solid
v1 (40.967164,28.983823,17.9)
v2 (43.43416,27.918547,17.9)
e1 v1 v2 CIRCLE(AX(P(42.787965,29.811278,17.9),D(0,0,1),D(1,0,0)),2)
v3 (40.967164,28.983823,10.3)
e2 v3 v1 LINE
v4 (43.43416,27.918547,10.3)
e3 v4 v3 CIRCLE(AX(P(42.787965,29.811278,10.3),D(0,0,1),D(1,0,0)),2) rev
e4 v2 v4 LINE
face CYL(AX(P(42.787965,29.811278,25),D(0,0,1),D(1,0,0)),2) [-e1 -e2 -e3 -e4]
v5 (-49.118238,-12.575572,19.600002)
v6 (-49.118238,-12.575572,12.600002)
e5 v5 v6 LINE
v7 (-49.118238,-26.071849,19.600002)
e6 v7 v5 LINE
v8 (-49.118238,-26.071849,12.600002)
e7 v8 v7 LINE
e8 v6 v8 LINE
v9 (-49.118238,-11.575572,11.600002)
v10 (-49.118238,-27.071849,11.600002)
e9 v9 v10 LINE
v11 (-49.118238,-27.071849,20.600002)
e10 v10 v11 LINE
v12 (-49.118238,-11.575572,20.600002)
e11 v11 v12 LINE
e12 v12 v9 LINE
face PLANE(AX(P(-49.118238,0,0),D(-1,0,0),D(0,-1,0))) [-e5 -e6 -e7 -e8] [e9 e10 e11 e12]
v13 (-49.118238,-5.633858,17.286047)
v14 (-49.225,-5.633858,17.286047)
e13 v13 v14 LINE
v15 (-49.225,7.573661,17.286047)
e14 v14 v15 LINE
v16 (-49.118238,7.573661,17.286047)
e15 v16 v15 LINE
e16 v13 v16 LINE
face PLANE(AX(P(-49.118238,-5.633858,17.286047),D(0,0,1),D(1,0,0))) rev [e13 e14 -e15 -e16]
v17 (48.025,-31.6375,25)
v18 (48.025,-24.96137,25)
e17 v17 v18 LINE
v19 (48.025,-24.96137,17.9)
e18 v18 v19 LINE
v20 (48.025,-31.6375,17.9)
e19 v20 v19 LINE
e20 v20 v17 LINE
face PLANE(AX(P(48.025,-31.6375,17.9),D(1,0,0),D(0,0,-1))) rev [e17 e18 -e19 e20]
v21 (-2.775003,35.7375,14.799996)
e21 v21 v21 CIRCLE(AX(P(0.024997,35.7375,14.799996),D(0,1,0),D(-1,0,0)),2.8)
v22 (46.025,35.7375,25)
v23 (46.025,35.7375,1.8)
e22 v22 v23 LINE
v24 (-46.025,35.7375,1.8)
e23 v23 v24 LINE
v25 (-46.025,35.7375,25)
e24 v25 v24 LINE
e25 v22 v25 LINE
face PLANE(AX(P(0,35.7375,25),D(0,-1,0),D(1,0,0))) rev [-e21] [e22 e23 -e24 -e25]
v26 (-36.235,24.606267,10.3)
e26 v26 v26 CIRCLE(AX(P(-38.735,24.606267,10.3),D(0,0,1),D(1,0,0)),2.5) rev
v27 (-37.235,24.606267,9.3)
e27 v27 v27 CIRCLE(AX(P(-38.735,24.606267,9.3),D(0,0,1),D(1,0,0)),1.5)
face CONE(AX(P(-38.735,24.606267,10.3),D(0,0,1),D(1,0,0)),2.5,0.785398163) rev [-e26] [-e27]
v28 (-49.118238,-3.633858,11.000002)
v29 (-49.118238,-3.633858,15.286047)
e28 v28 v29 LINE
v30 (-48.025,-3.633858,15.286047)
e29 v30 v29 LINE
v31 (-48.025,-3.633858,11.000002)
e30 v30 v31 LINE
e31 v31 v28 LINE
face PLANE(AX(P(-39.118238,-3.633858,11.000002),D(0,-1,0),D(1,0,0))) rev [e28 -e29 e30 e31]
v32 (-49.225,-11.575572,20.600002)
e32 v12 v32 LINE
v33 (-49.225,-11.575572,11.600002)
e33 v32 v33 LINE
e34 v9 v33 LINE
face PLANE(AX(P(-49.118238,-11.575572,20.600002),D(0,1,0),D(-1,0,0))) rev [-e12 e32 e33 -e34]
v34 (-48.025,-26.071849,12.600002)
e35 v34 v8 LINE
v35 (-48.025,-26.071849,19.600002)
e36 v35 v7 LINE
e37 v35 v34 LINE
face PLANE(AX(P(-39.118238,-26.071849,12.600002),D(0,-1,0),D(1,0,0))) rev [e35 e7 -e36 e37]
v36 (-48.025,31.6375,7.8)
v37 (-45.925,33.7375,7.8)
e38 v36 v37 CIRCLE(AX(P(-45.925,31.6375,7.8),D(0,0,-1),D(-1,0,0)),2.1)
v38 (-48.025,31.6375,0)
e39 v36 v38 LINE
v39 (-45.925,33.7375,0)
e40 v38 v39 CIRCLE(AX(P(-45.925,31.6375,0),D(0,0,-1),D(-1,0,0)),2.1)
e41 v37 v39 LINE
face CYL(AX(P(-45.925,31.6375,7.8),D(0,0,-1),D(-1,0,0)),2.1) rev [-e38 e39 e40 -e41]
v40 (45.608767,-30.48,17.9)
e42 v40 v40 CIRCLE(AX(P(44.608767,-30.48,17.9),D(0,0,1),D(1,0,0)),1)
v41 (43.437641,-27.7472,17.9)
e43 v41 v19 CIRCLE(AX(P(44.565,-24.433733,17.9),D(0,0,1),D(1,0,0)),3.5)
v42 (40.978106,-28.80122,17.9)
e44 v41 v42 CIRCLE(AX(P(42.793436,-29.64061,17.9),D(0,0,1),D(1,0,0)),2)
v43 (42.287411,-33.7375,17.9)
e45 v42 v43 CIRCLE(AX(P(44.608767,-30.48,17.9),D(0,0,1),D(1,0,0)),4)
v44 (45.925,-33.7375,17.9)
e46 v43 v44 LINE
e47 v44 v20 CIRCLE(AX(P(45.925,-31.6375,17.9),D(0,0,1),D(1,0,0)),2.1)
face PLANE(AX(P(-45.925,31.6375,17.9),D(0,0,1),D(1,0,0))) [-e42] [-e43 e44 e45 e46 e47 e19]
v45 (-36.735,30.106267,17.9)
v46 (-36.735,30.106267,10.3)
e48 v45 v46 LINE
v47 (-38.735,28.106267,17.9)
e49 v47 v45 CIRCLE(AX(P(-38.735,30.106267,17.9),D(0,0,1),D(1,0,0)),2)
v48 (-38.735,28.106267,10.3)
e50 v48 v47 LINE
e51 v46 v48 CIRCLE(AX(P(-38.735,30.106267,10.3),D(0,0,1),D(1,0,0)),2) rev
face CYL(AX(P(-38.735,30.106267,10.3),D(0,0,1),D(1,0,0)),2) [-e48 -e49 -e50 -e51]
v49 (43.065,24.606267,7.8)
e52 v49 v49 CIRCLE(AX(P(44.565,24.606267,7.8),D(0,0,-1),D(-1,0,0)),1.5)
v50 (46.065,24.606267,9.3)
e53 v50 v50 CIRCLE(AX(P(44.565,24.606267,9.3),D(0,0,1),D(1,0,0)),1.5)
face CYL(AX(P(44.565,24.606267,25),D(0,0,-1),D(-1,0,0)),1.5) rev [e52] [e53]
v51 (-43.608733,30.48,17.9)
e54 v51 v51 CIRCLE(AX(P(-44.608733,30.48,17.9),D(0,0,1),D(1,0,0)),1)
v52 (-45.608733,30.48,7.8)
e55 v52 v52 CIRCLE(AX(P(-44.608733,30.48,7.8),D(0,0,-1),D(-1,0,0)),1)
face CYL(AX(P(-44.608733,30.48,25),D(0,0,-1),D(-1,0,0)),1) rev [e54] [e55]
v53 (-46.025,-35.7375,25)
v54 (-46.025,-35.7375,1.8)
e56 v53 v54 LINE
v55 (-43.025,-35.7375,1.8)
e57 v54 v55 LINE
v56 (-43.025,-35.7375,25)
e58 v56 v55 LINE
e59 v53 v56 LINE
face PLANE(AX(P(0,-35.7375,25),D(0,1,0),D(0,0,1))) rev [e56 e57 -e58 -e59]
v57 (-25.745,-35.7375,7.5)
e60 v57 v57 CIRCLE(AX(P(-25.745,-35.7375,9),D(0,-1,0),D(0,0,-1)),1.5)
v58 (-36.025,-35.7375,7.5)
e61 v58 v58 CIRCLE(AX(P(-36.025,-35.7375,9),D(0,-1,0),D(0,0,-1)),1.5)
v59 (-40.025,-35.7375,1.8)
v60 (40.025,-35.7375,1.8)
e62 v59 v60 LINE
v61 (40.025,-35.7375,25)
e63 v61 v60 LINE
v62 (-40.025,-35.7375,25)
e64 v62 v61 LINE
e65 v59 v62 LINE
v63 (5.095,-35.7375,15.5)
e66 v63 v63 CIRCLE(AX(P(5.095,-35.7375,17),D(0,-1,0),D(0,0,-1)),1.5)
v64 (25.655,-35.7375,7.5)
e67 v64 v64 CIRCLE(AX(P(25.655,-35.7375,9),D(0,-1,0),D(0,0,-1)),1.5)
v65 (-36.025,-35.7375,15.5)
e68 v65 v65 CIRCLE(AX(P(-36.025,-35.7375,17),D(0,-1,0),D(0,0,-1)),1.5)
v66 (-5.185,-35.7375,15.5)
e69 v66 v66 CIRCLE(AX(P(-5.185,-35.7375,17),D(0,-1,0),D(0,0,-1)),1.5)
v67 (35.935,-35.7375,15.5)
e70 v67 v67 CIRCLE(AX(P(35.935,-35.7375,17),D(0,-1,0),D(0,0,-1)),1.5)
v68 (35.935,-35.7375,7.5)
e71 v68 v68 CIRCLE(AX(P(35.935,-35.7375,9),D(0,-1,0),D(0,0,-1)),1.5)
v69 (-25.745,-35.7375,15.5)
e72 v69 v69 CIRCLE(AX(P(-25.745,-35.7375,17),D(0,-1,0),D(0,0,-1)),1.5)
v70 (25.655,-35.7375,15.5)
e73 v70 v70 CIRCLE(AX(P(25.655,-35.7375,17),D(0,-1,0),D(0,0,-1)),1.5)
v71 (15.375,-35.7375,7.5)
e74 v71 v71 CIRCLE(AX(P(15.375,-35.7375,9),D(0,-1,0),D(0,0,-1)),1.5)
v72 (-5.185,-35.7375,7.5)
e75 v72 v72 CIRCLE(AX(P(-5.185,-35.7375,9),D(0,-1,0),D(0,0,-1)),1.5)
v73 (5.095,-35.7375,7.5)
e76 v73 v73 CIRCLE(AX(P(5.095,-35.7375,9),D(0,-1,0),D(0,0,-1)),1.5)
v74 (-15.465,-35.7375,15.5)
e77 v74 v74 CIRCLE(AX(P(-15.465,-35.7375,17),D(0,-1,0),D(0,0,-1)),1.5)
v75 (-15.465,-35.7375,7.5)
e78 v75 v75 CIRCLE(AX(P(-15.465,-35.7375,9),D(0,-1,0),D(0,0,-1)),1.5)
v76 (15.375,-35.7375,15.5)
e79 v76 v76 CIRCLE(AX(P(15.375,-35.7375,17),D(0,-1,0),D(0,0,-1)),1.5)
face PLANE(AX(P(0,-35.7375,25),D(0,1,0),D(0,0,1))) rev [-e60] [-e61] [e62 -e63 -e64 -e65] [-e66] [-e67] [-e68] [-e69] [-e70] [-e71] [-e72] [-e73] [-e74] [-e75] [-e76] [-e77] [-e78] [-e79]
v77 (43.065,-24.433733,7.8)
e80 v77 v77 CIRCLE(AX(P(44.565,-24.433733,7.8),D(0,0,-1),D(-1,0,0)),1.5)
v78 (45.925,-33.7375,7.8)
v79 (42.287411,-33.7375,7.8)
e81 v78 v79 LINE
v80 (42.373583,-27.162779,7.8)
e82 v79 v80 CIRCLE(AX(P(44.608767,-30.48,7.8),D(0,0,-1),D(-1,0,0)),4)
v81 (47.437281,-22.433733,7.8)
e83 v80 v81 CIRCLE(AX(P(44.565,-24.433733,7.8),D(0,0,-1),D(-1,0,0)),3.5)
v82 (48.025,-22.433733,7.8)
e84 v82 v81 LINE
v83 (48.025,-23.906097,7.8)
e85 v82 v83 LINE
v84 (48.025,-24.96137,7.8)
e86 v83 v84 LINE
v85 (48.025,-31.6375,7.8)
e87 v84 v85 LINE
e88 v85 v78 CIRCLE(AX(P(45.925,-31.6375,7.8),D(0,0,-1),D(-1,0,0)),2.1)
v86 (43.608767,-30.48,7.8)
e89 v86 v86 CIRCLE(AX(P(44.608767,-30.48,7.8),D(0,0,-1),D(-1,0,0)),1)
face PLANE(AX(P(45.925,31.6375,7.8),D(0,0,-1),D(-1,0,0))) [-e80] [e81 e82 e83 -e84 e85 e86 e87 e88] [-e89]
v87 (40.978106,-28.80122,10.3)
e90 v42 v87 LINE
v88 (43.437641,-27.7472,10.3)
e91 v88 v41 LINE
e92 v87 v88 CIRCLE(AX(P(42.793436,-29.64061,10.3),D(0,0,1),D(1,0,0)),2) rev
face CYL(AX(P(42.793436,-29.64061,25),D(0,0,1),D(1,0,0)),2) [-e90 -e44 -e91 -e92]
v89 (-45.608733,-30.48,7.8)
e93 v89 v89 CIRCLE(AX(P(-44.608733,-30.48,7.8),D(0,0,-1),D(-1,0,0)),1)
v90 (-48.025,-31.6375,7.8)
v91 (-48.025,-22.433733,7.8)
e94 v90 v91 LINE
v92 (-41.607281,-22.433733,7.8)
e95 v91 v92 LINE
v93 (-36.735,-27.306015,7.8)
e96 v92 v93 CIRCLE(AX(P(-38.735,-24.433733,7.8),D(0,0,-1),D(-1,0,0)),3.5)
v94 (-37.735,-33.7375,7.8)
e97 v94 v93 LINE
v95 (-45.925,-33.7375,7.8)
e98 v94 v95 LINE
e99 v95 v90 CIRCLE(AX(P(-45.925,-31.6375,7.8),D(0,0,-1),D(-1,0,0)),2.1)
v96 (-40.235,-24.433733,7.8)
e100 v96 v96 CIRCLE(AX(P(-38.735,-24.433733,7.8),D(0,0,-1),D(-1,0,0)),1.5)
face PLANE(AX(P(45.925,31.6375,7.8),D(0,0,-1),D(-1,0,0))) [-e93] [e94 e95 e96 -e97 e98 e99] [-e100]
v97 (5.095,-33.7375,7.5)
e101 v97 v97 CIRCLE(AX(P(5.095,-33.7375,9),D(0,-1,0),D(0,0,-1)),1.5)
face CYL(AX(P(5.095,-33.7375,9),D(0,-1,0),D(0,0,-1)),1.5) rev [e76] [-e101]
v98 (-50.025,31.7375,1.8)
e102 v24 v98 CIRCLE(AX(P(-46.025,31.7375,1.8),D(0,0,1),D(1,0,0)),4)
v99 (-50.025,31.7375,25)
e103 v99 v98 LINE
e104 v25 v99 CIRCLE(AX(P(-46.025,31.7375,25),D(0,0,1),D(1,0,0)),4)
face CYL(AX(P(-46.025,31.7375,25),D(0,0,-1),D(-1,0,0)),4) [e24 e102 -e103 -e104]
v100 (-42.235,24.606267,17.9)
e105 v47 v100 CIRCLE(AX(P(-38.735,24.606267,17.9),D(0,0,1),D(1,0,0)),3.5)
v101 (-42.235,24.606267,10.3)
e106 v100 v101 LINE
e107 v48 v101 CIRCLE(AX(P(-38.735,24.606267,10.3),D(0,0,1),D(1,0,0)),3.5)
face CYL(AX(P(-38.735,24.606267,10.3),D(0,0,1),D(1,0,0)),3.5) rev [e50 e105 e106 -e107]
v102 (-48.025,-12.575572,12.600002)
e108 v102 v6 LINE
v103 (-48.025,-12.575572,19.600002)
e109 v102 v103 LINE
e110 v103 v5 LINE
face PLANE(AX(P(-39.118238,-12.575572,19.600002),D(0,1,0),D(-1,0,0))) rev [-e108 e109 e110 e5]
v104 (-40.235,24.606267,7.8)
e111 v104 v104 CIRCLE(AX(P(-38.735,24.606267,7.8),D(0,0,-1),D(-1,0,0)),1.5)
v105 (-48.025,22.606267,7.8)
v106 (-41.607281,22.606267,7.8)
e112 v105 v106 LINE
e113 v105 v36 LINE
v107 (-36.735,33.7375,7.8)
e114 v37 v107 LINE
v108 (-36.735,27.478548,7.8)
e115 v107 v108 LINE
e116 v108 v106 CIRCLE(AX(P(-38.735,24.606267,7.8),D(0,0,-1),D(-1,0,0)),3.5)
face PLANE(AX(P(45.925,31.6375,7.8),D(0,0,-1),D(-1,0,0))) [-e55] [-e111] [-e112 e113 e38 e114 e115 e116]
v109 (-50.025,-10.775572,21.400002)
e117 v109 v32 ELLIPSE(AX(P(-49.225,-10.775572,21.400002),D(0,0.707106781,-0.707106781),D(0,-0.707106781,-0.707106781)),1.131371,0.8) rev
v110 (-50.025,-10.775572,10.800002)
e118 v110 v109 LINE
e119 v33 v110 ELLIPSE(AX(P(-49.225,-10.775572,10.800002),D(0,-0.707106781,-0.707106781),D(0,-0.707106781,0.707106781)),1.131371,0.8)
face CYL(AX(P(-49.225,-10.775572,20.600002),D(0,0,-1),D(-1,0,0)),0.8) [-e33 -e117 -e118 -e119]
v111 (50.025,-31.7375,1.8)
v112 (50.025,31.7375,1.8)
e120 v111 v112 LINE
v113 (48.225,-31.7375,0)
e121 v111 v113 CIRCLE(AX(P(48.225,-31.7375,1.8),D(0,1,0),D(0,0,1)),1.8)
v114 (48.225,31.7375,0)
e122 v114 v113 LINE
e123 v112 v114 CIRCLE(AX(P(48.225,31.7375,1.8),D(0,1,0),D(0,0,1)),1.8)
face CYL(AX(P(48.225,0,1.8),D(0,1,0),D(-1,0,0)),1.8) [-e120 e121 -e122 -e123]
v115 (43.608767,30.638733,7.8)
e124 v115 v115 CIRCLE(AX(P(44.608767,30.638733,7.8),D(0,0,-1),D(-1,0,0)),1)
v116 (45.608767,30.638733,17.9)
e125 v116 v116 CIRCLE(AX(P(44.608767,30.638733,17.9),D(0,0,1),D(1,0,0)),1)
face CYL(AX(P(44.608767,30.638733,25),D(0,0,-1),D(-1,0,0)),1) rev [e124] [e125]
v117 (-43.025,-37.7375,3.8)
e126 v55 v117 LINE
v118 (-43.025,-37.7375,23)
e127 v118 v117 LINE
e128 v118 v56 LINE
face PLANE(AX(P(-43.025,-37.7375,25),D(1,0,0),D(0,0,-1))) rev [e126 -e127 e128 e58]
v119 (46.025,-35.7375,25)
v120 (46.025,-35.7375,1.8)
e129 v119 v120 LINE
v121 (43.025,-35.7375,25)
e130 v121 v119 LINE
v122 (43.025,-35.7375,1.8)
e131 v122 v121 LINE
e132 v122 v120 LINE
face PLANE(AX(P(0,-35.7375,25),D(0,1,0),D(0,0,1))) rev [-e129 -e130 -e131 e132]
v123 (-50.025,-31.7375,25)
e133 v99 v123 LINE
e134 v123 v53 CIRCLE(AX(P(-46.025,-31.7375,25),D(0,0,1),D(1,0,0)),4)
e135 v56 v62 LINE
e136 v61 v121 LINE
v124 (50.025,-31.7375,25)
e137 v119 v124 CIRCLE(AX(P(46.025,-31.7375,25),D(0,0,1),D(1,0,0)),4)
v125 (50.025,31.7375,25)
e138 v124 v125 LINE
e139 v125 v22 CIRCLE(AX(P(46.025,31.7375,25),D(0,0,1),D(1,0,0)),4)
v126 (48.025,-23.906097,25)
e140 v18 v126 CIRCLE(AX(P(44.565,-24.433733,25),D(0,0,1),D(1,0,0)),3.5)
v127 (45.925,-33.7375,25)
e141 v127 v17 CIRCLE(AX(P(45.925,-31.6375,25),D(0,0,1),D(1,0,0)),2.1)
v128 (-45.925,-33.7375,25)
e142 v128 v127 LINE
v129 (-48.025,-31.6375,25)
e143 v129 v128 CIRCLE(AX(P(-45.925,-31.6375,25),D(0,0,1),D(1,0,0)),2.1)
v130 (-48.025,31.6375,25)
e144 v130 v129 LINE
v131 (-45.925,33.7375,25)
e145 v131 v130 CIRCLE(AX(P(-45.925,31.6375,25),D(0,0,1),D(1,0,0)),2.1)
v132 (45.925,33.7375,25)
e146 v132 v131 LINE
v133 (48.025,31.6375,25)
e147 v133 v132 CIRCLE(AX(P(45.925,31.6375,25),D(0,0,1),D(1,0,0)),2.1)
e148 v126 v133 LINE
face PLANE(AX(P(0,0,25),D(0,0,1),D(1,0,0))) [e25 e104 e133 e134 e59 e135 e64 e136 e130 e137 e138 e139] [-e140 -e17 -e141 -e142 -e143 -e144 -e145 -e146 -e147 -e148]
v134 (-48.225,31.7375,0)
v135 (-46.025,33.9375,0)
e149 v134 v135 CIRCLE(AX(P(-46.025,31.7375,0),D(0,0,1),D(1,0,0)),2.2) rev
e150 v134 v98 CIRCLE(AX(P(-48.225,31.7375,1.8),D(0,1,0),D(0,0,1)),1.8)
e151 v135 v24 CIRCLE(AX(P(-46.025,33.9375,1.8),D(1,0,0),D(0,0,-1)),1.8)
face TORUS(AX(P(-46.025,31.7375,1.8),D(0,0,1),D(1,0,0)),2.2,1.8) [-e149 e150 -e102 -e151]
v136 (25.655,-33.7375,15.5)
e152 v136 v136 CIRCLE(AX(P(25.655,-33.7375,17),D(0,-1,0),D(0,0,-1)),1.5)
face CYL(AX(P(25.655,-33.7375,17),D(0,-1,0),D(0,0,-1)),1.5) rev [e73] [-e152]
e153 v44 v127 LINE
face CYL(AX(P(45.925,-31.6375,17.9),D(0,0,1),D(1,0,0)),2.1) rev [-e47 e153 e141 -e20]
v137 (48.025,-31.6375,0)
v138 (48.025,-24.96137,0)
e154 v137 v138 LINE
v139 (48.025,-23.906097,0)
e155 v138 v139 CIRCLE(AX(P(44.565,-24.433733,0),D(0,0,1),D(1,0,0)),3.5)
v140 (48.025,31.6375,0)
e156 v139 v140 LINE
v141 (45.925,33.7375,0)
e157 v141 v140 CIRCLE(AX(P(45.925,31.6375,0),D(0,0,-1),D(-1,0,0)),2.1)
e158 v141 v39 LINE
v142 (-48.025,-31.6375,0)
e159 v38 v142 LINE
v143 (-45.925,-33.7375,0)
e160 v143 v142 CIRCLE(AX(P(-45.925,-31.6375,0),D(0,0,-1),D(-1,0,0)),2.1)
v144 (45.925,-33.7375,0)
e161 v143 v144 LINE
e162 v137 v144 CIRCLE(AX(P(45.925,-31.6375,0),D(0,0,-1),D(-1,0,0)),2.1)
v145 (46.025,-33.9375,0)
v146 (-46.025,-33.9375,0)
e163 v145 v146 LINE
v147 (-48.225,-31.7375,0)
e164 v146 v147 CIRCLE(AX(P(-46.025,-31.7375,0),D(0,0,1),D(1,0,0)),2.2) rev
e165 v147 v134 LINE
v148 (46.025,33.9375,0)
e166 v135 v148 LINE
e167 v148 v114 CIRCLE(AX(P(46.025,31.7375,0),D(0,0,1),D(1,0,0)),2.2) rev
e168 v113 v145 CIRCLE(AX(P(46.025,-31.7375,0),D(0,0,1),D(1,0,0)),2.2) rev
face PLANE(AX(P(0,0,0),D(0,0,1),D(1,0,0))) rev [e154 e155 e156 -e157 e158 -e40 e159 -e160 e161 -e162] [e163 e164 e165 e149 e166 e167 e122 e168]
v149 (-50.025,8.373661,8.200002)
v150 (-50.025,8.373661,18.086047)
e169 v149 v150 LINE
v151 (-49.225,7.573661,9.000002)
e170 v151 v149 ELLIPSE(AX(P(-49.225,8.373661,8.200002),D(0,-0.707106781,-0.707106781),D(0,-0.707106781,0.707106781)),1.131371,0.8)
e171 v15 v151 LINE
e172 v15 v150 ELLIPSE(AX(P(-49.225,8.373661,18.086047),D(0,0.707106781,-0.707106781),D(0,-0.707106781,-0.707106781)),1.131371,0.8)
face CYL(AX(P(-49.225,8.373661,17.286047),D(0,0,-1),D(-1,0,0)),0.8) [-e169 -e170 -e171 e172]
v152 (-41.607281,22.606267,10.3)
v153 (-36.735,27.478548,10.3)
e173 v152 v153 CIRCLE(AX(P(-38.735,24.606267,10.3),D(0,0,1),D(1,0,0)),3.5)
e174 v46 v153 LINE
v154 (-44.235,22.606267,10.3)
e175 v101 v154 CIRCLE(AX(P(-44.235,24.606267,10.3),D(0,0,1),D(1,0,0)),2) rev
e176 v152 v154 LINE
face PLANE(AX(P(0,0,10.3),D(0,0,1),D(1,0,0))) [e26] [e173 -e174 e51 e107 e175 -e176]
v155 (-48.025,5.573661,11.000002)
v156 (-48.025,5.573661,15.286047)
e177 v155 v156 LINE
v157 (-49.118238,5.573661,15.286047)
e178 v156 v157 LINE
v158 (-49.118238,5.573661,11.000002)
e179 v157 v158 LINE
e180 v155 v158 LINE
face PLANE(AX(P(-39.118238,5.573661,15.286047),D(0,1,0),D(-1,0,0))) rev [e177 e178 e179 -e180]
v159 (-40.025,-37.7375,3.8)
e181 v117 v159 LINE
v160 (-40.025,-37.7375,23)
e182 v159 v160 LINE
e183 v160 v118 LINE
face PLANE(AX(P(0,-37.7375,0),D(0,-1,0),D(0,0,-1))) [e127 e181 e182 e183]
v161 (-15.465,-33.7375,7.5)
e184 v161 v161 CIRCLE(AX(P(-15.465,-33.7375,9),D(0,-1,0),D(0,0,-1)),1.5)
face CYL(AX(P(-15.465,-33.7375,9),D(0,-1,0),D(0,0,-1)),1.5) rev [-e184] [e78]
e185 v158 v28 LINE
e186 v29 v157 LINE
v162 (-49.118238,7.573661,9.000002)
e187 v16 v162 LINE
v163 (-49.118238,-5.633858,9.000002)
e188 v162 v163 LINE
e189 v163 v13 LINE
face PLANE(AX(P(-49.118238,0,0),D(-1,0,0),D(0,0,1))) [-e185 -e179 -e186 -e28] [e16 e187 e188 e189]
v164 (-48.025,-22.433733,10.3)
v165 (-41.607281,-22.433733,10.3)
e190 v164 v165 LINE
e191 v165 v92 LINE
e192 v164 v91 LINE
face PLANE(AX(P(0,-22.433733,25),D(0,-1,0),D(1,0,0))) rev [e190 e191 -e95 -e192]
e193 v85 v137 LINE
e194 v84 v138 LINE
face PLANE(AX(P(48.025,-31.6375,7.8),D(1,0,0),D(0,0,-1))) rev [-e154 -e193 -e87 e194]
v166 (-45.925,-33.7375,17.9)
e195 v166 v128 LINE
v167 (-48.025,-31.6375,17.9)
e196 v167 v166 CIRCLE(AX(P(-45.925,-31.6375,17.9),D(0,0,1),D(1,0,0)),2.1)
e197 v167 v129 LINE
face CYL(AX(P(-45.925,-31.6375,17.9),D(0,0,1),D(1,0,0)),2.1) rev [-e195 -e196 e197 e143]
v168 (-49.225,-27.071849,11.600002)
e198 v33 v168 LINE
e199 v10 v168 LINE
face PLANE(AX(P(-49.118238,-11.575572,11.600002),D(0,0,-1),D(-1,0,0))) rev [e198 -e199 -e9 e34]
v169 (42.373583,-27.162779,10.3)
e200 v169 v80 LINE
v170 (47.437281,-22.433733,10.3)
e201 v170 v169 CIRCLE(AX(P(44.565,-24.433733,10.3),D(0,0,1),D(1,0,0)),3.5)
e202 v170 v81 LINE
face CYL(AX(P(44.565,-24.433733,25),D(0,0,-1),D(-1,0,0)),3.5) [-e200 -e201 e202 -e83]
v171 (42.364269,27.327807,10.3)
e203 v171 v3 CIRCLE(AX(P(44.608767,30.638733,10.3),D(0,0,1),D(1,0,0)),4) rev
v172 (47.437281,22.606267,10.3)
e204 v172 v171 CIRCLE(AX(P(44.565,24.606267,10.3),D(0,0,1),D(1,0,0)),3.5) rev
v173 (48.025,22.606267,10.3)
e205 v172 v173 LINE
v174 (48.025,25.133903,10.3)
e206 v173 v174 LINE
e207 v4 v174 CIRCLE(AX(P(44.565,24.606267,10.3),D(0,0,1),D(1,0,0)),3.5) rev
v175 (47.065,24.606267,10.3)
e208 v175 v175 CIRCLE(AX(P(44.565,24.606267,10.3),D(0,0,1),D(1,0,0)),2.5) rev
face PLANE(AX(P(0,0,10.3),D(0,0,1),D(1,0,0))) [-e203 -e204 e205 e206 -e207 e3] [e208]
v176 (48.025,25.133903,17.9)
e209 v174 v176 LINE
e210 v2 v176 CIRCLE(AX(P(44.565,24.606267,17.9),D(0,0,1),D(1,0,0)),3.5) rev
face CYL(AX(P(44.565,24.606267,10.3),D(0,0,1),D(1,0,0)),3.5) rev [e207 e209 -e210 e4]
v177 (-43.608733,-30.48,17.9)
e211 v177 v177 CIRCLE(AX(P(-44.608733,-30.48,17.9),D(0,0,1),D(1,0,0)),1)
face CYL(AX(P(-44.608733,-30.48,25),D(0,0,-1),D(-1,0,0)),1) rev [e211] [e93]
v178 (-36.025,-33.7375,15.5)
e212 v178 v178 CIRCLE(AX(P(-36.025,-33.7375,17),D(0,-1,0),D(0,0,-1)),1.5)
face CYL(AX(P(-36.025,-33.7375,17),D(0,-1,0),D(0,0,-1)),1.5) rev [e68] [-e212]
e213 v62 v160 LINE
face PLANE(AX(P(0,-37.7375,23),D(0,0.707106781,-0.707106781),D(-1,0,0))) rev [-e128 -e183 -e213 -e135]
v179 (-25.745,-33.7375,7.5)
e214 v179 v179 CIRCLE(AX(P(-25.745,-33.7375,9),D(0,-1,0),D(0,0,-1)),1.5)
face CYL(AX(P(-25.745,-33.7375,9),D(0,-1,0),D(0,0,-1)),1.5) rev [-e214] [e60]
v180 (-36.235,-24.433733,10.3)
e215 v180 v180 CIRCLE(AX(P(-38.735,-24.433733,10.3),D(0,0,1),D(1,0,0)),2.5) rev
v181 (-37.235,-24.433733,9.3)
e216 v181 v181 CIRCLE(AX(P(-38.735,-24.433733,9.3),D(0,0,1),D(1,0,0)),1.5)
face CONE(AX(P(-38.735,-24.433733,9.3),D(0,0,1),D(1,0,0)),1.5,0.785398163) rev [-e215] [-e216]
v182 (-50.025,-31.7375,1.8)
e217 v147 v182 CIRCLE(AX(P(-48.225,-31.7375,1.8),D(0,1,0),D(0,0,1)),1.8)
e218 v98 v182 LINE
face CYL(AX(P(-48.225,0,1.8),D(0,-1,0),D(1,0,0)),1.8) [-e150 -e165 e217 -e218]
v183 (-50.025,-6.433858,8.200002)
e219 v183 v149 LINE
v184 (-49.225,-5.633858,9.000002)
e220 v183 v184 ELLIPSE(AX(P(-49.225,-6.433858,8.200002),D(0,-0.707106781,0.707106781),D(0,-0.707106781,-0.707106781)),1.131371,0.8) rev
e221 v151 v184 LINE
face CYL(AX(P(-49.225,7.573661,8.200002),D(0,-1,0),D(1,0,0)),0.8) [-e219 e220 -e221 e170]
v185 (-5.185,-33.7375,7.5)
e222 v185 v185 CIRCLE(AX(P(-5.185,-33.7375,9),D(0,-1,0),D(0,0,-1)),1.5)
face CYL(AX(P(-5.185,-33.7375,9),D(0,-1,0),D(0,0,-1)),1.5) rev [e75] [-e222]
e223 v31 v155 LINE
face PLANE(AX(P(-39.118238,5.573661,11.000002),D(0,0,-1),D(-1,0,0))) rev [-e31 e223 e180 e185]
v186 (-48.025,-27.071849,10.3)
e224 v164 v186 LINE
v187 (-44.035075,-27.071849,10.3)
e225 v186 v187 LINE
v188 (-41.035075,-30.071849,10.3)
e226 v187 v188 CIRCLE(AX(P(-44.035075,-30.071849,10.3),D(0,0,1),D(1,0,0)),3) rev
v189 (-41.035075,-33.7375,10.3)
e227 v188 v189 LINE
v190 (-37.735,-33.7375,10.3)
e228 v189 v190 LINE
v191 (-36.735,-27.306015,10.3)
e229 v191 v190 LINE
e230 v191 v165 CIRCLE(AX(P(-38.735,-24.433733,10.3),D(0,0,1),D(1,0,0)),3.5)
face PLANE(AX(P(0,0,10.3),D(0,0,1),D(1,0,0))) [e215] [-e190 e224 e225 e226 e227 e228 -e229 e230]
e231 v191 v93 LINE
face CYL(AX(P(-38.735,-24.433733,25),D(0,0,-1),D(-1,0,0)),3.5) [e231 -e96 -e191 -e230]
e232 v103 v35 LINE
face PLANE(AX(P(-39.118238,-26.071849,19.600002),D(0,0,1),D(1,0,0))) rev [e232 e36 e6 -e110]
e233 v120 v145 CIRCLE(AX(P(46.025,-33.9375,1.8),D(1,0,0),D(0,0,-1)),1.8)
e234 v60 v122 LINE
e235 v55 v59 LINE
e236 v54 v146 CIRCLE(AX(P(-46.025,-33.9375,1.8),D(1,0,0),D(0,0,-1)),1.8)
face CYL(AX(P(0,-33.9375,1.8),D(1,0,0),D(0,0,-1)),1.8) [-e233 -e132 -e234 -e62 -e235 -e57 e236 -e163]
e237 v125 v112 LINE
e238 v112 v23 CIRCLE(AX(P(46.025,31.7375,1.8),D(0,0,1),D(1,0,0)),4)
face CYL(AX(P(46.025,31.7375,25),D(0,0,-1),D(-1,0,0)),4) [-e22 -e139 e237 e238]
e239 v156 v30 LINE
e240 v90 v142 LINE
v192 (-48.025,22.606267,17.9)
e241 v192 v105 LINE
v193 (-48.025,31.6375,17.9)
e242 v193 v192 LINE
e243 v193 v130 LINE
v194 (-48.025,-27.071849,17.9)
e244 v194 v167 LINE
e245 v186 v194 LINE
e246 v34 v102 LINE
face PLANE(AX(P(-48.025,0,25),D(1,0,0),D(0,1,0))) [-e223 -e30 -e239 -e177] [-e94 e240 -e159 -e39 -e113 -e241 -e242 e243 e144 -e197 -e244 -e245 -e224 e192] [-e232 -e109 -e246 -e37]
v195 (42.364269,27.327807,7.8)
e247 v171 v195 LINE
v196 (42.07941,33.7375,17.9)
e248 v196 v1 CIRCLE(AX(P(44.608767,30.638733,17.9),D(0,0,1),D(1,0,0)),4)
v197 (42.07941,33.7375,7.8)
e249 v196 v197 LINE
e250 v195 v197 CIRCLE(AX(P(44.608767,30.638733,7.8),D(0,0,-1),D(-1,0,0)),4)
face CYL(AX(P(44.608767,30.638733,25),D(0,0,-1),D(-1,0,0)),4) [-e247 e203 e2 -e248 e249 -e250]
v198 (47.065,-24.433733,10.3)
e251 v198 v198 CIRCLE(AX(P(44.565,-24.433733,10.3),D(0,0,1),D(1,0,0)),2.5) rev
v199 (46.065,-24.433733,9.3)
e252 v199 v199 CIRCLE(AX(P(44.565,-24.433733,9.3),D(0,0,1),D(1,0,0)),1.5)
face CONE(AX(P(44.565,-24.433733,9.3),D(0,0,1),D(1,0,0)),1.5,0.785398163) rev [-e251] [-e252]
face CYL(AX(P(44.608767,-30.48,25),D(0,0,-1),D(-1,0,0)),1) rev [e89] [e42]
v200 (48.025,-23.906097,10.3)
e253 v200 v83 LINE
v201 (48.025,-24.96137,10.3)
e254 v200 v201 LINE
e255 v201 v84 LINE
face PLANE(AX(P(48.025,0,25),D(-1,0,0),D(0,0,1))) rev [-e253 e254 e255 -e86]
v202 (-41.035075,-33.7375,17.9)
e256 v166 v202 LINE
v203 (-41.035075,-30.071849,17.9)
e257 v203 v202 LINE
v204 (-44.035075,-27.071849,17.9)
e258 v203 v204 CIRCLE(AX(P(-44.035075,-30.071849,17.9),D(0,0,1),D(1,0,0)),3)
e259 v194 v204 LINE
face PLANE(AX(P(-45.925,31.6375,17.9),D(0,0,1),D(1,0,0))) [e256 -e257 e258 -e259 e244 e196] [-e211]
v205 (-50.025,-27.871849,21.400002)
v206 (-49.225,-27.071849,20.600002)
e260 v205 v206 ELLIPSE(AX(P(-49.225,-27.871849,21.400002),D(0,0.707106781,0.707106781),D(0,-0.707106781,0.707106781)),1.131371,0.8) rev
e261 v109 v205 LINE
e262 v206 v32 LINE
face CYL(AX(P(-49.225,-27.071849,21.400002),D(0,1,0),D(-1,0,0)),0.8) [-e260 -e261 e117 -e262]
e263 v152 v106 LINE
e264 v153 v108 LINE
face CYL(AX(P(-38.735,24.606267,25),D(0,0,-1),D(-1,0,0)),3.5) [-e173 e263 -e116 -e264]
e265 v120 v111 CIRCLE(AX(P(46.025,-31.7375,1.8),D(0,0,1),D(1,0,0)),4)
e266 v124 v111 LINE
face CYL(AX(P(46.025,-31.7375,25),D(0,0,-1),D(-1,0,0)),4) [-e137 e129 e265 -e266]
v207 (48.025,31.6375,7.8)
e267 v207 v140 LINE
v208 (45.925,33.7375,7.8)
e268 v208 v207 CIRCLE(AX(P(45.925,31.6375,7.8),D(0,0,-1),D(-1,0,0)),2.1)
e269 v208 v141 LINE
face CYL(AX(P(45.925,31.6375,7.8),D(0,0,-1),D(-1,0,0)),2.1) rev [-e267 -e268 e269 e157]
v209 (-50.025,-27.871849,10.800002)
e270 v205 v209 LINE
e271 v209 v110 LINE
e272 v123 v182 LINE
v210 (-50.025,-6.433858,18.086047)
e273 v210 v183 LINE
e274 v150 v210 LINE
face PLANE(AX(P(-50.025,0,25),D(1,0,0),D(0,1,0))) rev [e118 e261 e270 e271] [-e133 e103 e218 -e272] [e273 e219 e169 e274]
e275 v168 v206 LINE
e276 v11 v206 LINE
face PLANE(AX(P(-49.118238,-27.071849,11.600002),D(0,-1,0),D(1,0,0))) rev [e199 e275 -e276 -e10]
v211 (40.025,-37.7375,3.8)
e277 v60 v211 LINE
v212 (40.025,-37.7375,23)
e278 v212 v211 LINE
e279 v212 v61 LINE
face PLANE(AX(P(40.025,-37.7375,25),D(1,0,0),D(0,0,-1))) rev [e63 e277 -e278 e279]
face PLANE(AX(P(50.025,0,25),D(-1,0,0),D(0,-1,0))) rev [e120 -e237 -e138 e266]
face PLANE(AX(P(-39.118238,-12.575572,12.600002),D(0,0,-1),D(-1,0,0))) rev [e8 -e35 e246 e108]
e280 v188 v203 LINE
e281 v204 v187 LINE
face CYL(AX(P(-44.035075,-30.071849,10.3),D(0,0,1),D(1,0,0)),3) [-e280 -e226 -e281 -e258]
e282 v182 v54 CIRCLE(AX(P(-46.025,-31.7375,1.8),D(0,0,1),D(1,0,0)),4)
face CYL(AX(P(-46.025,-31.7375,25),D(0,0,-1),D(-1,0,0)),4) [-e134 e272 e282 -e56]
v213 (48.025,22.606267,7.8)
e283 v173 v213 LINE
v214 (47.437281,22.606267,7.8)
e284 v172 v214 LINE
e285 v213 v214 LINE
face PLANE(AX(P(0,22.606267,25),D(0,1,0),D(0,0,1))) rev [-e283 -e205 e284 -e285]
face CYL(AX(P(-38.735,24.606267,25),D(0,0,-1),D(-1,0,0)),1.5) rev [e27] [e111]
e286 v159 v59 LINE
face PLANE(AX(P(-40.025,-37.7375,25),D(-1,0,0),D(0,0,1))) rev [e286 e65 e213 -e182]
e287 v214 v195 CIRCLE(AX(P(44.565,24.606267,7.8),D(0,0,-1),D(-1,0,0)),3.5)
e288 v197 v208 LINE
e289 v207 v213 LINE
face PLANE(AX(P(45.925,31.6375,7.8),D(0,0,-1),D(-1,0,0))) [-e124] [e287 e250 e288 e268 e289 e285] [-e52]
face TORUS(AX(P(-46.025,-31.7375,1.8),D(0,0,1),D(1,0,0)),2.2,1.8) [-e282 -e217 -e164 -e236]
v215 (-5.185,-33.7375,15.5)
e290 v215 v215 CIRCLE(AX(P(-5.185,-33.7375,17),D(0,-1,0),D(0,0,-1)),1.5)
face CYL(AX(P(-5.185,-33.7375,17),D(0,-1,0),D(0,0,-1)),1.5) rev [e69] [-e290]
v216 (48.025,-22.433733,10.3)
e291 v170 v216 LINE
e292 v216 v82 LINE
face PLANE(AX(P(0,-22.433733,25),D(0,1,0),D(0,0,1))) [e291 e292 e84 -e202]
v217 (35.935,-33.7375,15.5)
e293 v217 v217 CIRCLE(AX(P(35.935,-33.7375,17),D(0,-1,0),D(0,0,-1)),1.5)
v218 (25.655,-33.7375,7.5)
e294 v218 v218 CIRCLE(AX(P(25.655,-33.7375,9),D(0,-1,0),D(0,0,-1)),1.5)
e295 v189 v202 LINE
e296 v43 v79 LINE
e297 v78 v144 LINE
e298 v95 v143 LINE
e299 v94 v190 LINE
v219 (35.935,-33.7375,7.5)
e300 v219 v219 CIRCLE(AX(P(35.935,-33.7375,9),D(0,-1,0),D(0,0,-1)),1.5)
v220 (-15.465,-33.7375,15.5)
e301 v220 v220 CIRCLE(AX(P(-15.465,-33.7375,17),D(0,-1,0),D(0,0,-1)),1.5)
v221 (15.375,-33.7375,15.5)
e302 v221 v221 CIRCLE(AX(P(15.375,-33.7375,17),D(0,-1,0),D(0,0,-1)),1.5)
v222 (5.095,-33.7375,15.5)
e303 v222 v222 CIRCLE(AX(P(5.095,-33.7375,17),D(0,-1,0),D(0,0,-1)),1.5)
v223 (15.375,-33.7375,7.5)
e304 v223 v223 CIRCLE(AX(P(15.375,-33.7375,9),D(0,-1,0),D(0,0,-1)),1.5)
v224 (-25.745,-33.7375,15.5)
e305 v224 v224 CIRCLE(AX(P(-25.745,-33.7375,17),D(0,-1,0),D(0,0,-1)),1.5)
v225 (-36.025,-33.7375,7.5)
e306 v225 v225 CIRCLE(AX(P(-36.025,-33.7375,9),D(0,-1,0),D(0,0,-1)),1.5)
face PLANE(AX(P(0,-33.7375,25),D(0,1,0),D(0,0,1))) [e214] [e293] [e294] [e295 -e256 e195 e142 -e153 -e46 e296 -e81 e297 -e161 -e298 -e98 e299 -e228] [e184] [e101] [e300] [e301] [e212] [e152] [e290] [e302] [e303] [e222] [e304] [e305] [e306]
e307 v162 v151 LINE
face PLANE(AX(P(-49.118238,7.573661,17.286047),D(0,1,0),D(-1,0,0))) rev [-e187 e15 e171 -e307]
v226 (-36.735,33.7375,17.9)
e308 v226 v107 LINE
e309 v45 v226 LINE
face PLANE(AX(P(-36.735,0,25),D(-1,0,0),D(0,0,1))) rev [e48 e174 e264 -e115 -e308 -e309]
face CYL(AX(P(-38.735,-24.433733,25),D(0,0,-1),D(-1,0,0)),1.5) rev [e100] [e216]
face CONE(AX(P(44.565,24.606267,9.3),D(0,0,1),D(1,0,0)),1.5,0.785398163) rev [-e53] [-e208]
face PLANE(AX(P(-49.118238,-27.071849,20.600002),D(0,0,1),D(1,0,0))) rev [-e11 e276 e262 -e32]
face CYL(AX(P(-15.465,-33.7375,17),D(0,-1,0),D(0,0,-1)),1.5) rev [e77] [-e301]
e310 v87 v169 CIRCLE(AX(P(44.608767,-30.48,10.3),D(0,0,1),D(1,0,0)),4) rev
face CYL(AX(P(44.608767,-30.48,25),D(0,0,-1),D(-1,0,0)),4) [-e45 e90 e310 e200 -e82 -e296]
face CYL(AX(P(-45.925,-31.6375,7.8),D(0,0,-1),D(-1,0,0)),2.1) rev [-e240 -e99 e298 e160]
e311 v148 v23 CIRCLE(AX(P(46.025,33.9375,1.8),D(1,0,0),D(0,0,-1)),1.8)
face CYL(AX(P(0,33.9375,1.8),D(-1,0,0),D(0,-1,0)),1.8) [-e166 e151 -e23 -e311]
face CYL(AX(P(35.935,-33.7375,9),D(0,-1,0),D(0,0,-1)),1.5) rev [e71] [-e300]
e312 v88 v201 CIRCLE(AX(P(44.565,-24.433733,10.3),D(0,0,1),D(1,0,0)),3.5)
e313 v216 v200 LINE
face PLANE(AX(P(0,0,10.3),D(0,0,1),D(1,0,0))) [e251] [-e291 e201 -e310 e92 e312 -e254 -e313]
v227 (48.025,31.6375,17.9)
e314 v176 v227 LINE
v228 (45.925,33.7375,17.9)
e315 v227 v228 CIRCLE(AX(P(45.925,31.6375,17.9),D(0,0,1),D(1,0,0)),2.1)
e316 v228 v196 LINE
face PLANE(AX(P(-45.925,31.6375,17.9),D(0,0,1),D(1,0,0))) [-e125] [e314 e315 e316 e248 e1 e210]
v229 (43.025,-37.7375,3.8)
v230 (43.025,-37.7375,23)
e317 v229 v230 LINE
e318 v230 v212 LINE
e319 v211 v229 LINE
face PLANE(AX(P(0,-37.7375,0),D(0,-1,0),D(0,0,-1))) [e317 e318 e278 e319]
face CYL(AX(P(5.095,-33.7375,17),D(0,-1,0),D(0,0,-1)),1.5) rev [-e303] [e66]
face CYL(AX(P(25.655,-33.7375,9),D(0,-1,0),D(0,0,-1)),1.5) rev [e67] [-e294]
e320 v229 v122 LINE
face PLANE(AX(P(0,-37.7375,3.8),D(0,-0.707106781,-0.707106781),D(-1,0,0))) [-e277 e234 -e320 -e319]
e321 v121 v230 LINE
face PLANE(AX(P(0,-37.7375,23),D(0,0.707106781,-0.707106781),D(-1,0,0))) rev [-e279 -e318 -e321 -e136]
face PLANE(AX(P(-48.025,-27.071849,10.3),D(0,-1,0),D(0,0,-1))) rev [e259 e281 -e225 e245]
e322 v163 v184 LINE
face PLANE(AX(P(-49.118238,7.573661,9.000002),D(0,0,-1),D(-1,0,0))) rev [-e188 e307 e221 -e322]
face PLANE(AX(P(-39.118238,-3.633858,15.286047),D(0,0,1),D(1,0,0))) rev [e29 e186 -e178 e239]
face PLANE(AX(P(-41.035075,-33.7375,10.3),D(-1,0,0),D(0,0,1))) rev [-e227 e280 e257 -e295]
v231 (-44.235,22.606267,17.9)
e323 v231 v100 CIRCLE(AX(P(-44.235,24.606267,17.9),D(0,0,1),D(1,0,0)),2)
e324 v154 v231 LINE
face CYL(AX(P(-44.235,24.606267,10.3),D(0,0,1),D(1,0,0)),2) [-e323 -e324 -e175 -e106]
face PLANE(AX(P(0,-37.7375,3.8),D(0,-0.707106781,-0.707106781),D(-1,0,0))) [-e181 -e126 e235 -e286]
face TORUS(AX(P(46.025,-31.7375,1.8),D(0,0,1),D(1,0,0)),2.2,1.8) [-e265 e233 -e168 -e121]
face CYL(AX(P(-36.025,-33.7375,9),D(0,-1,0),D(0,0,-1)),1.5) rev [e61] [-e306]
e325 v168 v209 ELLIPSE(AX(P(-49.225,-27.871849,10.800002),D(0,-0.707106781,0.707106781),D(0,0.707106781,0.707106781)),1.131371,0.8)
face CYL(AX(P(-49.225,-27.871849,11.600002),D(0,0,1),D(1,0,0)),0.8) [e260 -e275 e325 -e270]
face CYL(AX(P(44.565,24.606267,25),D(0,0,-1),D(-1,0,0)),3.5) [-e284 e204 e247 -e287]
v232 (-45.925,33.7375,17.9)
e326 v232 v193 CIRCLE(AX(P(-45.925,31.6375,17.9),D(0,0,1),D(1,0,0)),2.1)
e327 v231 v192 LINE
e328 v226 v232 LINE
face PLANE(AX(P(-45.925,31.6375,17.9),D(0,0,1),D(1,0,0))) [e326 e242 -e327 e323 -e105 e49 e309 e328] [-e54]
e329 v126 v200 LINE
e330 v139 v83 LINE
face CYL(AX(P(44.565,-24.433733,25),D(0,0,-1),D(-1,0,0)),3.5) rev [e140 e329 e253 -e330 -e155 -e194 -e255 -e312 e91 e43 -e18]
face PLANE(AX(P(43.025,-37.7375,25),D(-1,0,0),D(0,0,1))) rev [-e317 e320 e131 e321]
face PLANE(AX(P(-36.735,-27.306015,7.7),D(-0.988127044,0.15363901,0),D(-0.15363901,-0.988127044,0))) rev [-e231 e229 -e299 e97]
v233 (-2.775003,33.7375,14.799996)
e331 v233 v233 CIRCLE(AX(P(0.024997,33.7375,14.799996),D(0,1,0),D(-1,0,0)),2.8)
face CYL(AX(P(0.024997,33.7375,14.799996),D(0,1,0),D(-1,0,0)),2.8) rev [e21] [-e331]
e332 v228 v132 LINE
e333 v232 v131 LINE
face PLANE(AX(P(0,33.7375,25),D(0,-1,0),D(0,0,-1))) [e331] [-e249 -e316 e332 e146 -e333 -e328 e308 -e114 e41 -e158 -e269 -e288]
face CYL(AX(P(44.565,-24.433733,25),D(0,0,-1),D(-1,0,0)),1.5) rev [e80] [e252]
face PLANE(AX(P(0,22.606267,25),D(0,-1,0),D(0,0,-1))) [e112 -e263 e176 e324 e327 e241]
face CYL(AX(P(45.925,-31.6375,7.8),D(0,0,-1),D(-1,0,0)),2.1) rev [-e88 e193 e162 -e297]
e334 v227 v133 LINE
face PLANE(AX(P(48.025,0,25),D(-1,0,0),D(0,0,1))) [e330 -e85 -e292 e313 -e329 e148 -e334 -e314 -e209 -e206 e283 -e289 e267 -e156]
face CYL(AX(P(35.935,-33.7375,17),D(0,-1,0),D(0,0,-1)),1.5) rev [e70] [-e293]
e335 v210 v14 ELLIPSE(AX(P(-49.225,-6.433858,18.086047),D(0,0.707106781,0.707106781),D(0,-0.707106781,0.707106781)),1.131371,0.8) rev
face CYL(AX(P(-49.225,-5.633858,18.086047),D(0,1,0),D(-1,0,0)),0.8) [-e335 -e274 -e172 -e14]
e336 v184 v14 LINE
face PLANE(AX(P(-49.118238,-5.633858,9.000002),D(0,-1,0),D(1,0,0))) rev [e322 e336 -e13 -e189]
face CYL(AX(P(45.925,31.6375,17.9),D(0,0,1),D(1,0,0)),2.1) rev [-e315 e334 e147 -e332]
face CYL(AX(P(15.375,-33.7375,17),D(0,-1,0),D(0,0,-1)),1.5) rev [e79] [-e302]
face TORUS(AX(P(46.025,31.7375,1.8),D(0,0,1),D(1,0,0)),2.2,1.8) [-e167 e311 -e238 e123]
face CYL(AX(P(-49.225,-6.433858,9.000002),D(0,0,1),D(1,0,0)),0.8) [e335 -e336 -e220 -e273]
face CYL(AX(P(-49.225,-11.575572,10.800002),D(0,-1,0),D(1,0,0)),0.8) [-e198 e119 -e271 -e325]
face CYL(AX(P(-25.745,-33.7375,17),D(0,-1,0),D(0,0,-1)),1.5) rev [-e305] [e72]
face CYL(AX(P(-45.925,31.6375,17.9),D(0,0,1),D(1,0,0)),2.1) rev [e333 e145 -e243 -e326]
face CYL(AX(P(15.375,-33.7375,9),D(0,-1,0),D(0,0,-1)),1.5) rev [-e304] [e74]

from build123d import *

# Parameters (mm, degrees)
CUT_EXTRUDE_START         = -25
CUT_EXTRUDE_1_OUTLINE_R   = 1
CUT_EXTRUDE_1_OUTLINE_R_2 = 1.5
CUT_EXTRUDE_1_DEPTH       = 17.2
CUT_EXTRUDE_START_2       = -7.8
CUT_EXTRUDE_1_2_DEPTH     = 7.8
CUT_EXTRUDE_2_DEPTH       = 7.1
SKETCH_5_R                = 1.5
SKETCH_5_R_2              = 3.5
CUT_EXTRUDE_3_DEPTH       = 7.6
FILLET_1_R                = 2
FILLET_2_R                = 1.8
SKETCH_12_W               = 9
SKETCH_12_H               = 15.496277761
SKETCH_12_W_2             = 8.286045674
SKETCH_12_H_2             = 13.20751885
CUT_EXTRUDE_7_DEPTH       = 0.90676236
SKETCH_13_W               = 7
SKETCH_13_H               = 13.496277761
SKETCH_13_W_2             = 4.286045674
SKETCH_13_H_2             = 9.20751885
CUT_EXTRUDE_8_DEPTH       = 10
SKETCH_14_W               = 10
SKETCH_14_H               = 5
CUT_EXTRUDE_9_DEPTH       = 7.6
FILLET_3_R                = 0.8
SKETCH_16_R               = 2.8
CUT_EXTRUDE_10_DEPTH      = 2
SKETCH_17_R               = 1.5
CUT_EXTRUDE_11_DEPTH      = 2
SKETCH_18_W               = 4.300074763
SKETCH_18_H               = 6.665650657
CUT_EXTRUDE_12_DEPTH      = 7.6
FILLET_4_R                = 3
CUT_EXTRUDE_13_DEPTH      = 2.6
SKETCH_20_W               = 3
SKETCH_20_H               = 23.2
EXTRUDE_2_DEPTH           = 2
CHAMFER_2_SIZE            = 2
CHAMFER_3_SIZE            = 1


with BuildPart() as part:
    # Вырез-Вытянуть1: read off the stored shape, not the designer's step
    # Вырез-Вытянуть1 outline → Вырез-Вытянуть1 (new body)
    with BuildSketch(Plane(origin=(0, 0, 0), x_dir=(-1, 0, 0), z_dir=(0, 0, -1)).offset(CUT_EXTRUDE_START)):
        with BuildLine():
            Line((46.025, 35.7375), (-46.025, 35.7375))
            ThreePointArc((-46.025, 35.7375), (-48.853427125, 34.565927125), (-50.025, 31.7375))
            Line((-50.025, 31.7375), (-50.025, -31.7375))
            ThreePointArc((-50.025, -31.7375), (-48.853427125, -34.565927125), (-46.025, -35.7375))
            Line((-46.025, -35.7375), (46.025, -35.7375))
            ThreePointArc((46.025, -35.7375), (48.853427125, -34.565927125), (50.025, -31.7375))
            Line((50.025, -31.7375), (50.025, 31.7375))
            ThreePointArc((50.025, 31.7375), (48.853427125, 34.565927125), (46.025, 35.7375))
        make_face()
        with BuildLine():
            ThreePointArc((-42.287410651, -33.7375), (-40.609110189, -30.427578056), (-42.373582962, -27.162779204))
            ThreePointArc((-42.373582962, -27.162779204), (-42.176095909, -21.875777657), (-47.437281323, -22.433733333))
            Line((-47.437281323, -22.433733333), (-48.025, -22.433733333))
            Line((-48.025, -22.433733333), (-48.025, 22.606266667))
            Line((-48.025, 22.606266667), (-47.437281323, 22.606266667))
            ThreePointArc((-47.437281323, 22.606266667), (-42.180470358, 22.044232634), (-42.364269143, 27.32780735))
            ThreePointArc((-42.364269143, 27.32780735), (-40.612710996, 30.461140888), (-42.07941, 33.7375))
            Line((-42.07941, 33.7375), (36.735, 33.7375))
            Line((36.735, 33.7375), (36.735, 27.47854799))
            ThreePointArc((36.735, 27.47854799), (36.260126266, 22.131392933), (41.607281323, 22.606266667))
            Line((41.607281323, 22.606266667), (48.025, 22.606266667))
            Line((48.025, 22.606266667), (48.025, -22.433733333))
            Line((48.025, -22.433733333), (41.607281323, -22.433733333))
            ThreePointArc((41.607281323, -22.433733333), (36.260126265, -21.9588596), (36.735, -27.306014657))
            Line((36.735, -27.306014657), (36.735, -33.7375))
            Line((36.735, -33.7375), (-42.287410651, -33.7375))
        make_face(mode=Mode.SUBTRACT)
        with BuildLine():
            Line((-48.025, -23.906097095), (-48.025, -24.961369572))
            ThreePointArc((-48.025, -24.961369572), (-48.065, -24.433733334), (-48.025, -23.906097095))
        make_face(mode=Mode.SUBTRACT)
        with Locations((-44.608766667, -30.48)):
            Circle(CUT_EXTRUDE_1_OUTLINE_R, mode=Mode.SUBTRACT)
        with Locations((-44.565, -24.433733333)):
            Circle(CUT_EXTRUDE_1_OUTLINE_R_2, mode=Mode.SUBTRACT)
        with Locations((38.735, -24.433733333)):
            Circle(CUT_EXTRUDE_1_OUTLINE_R_2, mode=Mode.SUBTRACT)
        with Locations((44.608733333, -30.48)):
            Circle(CUT_EXTRUDE_1_OUTLINE_R, mode=Mode.SUBTRACT)
        with Locations((44.608733333, 30.48)):
            Circle(CUT_EXTRUDE_1_OUTLINE_R, mode=Mode.SUBTRACT)
        with Locations((38.735, 24.606266667)):
            Circle(CUT_EXTRUDE_1_OUTLINE_R_2, mode=Mode.SUBTRACT)
        with Locations((-44.565, 24.606266667)):
            Circle(CUT_EXTRUDE_1_OUTLINE_R_2, mode=Mode.SUBTRACT)
        with Locations((-44.608766667, 30.638733333)):
            Circle(CUT_EXTRUDE_1_OUTLINE_R, mode=Mode.SUBTRACT)
    extrude(amount=CUT_EXTRUDE_1_DEPTH)

    # Cut-Extrude 1 2 outline → Cut-Extrude 1 2 (add)
    with BuildSketch(Plane(origin=(0, 0, 0), x_dir=(-1, 0, 0), z_dir=(0, 0, -1)).offset(CUT_EXTRUDE_START_2)):
        with BuildLine():
            Line((46.025, 35.7375), (-46.025, 35.7375))
            ThreePointArc((-46.025, 35.7375), (-48.853427125, 34.565927125), (-50.025, 31.7375))
            Line((-50.025, 31.7375), (-50.025, -31.7375))
            ThreePointArc((-50.025, -31.7375), (-48.853427125, -34.565927125), (-46.025, -35.7375))
            Line((-46.025, -35.7375), (46.025, -35.7375))
            ThreePointArc((46.025, -35.7375), (48.853427125, -34.565927125), (50.025, -31.7375))
            Line((50.025, -31.7375), (50.025, 31.7375))
            ThreePointArc((50.025, 31.7375), (48.853427125, 34.565927125), (46.025, 35.7375))
        make_face()
        with BuildLine():
            Line((45.925, -33.7375), (-45.925, -33.7375))
            ThreePointArc((-45.925, -33.7375), (-47.40992424, -33.12242424), (-48.025, -31.6375))
            Line((-48.025, -31.6375), (-48.025, -24.961369572))
            ThreePointArc((-48.025, -24.961369572), (-48.065, -24.433733334), (-48.025, -23.906097095))
            Line((-48.025, -23.906097095), (-48.025, 31.6375))
            ThreePointArc((-48.025, 31.6375), (-47.40992424, 33.12242424), (-45.925, 33.7375))
            Line((-45.925, 33.7375), (45.925, 33.7375))
            ThreePointArc((45.925, 33.7375), (47.40992424, 33.12242424), (48.025, 31.6375))
            Line((48.025, 31.6375), (48.025, -31.6375))
            ThreePointArc((48.025, -31.6375), (47.40992424, -33.12242424), (45.925, -33.7375))
        make_face(mode=Mode.SUBTRACT)
    extrude(amount=CUT_EXTRUDE_1_2_DEPTH)

    # Эскиз4 → Вырез-Вытянуть2 (cut)
    with BuildSketch(Plane.XY.offset(25)):
        with BuildLine():
            Line((-48.025, 31.6375), (-48.025, -31.6375))
            ThreePointArc((-48.025, -31.6375), (-47.40992424, -33.12242424), (-45.925, -33.7375))
            Line((-45.925, -33.7375), (45.925, -33.7375))
            ThreePointArc((45.925, -33.7375), (47.40992424, -33.12242424), (48.025, -31.6375))
            Line((48.025, -31.6375), (48.025, 31.6375))
            ThreePointArc((48.025, 31.6375), (47.40992424, 33.12242424), (45.925, 33.7375))
            Line((45.925, 33.7375), (-45.925, 33.7375))
            ThreePointArc((-45.925, 33.7375), (-47.40992424, 33.12242424), (-48.025, 31.6375))
        make_face()
    extrude(amount=-CUT_EXTRUDE_2_DEPTH, mode=Mode.SUBTRACT)

    # Эскиз5 → Вырез-Вытянуть3 (cut)
    # profile 1 of 4: a face of its own
    with BuildSketch(Plane.XY.offset(17.9)):
        with BuildLine():
            Line((47.437281323, 22.606266667), (48.025, 22.606266667))
            Line((48.025, 22.606266667), (48.025, 25.133902905))
            ThreePointArc((48.025, 25.133902905), (45.829809817, 27.869739683), (42.364269143, 27.32780735))
            ThreePointArc((42.364269143, 27.32780735), (42.180470358, 22.044232634), (47.437281323, 22.606266667))
        make_face()
    # profile 2 of 4: a face of its own
    with BuildSketch(Plane.XY.offset(17.9)):
        with BuildLine():
            ThreePointArc((-41.607281323, 22.606266667), (-37.686902827, 21.266881646), (-35.235, 24.606266667))
            ThreePointArc((-35.235, 24.606266667), (-35.632581589, 26.226451841), (-36.735, 27.47854799))
            ThreePointArc((-36.735, 27.47854799), (-41.209873734, 27.081140401), (-41.607281323, 22.606266667))
        make_face()
        with Locations(Location((-38.735, 24.606266667, 0), (0, 0, 180))):
            Circle(SKETCH_5_R, mode=Mode.SUBTRACT)
    # profile 3 of 4: a face of its own
    with BuildSketch(Plane.XY.offset(17.9)):
        with BuildLine():
            ThreePointArc((47.437281323, -22.433733333), (42.176095909, -21.875777657), (42.373582962, -27.162779204))
            ThreePointArc((42.373582962, -27.162779204), (45.835384499, -27.695040314), (48.025, -24.961369572))
            Line((48.025, -24.961369572), (48.025, -22.433733333))
            Line((48.025, -22.433733333), (47.437281323, -22.433733333))
        make_face()
    # profile 4 of 4: a face of its own
    with BuildSketch(Plane.XY.offset(17.9)):
        with Locations((-38.735, -24.433733333)):
            Circle(SKETCH_5_R_2)
    extrude(amount=-CUT_EXTRUDE_3_DEPTH, mode=Mode.SUBTRACT)

    # Скругление1
    fillet_1_edges = [part.edges().sort_by_distance(p)[0] for p in [
        (42.364269143, 27.32780735, 14.1),
        (-36.735, 27.47854799, 14.1),
        (-41.607281323, 22.606266667, 14.1),
        (-41.607281323, -22.433733333, 14.1),
        (-36.735, -27.306014657, 14.1),
        (42.373582962, -27.162779204, 14.1),
    ]]
    fillet(fillet_1_edges, radius=FILLET_1_R)

    # Скругление2
    fillet_2_edges = [part.edges().sort_by_distance(p)[0] for p in [
        (48.853427125, 34.565927125, 0),
        (50.025, 0, 0),
        (48.853427125, -34.565927125, 0),
        (0, -35.7375, 0),
        (-48.853427125, -34.565927125, 0),
        (-50.025, 0, 0),
        (-48.853427125, 34.565927125, 0),
        (0, 35.7375, 0),
    ]]
    fillet(fillet_2_edges, radius=FILLET_2_R)

    # Эскиз12 → Вырез-Вытянуть7 (cut)
    with BuildSketch(Plane.ZY.offset(50.025)):
        with Locations((16.100001679, -19.323710462)):
            Rectangle(SKETCH_12_W, SKETCH_12_H)
        with Locations((13.143024516, 0.969901898)):
            Rectangle(SKETCH_12_W_2, SKETCH_12_H_2)
    extrude(amount=-CUT_EXTRUDE_7_DEPTH, mode=Mode.SUBTRACT)

    # Эскиз13 → Вырез-Вытянуть8 (cut)
    with BuildSketch(Plane.ZY.offset(49.11823764)):
        with Locations((16.100001679, -19.323710462)):
            Rectangle(SKETCH_13_W, SKETCH_13_H)
        with Locations((13.143024516, 0.969901898)):
            Rectangle(SKETCH_13_W_2, SKETCH_13_H_2)
    extrude(amount=-CUT_EXTRUDE_8_DEPTH, mode=Mode.SUBTRACT)

    # Эскиз14 → Вырез-Вытянуть9 (cut)
    with BuildSketch(Plane.XY.offset(17.9)):
        with Locations((-43.025, -24.571849343)):
            Rectangle(SKETCH_14_W, SKETCH_14_H)
    extrude(amount=-CUT_EXTRUDE_9_DEPTH, mode=Mode.SUBTRACT)

    # Скругление3
    fillet_3_edges = [part.edges().sort_by_distance(p)[0] for p in [
        (-50.025, -19.323710463, 11.600001679),
        (-50.025, -27.071849343, 16.100001679),
        (-50.025, -19.323710463, 20.600001679),
        (-50.025, -11.575571582, 16.100001679),
        (-50.025, 0.969901898, 9.000001679),
        (-50.025, -5.633857527, 13.143024516),
        (-50.025, 0.969901898, 17.286047353),
        (-50.025, 7.573661323, 13.143024516),
    ]]
    fillet(fillet_3_edges, radius=FILLET_3_R)

    # Эскиз16 → Вырез-Вытянуть10 (cut)
    with BuildSketch(Plane(origin=(0, 35.7375, 0), x_dir=(1, 0, 0), z_dir=(0, 1, 0))):
        with Locations(Location((0.024996753, -14.799996232, 0), (0, 0, 180))):
            Circle(SKETCH_16_R)
    extrude(amount=-CUT_EXTRUDE_10_DEPTH, mode=Mode.SUBTRACT)

    # Эскиз17 → Вырез-Вытянуть11 (cut)
    with BuildSketch(Plane.XZ.offset(35.7375)):
        with Locations(Location((-36.025, 17, 0), (0, 0, 270))):
            Circle(SKETCH_17_R)
        with Locations(Location((-25.745, 17, 0), (0, 0, 270))):
            Circle(SKETCH_17_R)
        with Locations(Location((-15.465, 17, 0), (0, 0, 270))):
            Circle(SKETCH_17_R)
        with Locations(Location((-5.185, 17, 0), (0, 0, 270))):
            Circle(SKETCH_17_R)
        with Locations(Location((5.095, 17, 0), (0, 0, 270))):
            Circle(SKETCH_17_R)
        with Locations(Location((15.375, 17, 0), (0, 0, 270))):
            Circle(SKETCH_17_R)
        with Locations(Location((25.655, 17, 0), (0, 0, 270))):
            Circle(SKETCH_17_R)
        with Locations(Location((35.935, 17, 0), (0, 0, 270))):
            Circle(SKETCH_17_R)
        with Locations(Location((-25.745, 9, 0), (0, 0, 270))):
            Circle(SKETCH_17_R)
        with Locations(Location((-15.465, 9, 0), (0, 0, 270))):
            Circle(SKETCH_17_R)
        with Locations(Location((-5.185, 9, 0), (0, 0, 270))):
            Circle(SKETCH_17_R)
        with Locations(Location((5.095, 9, 0), (0, 0, 270))):
            Circle(SKETCH_17_R)
        with Locations(Location((15.375, 9, 0), (0, 0, 270))):
            Circle(SKETCH_17_R)
        with Locations(Location((25.655, 9, 0), (0, 0, 270))):
            Circle(SKETCH_17_R)
        with Locations(Location((35.935, 9, 0), (0, 0, 270))):
            Circle(SKETCH_17_R)
        with Locations(Location((-36.025, 9, 0), (0, 0, 270))):
            Circle(SKETCH_17_R)
    extrude(amount=-CUT_EXTRUDE_11_DEPTH, mode=Mode.SUBTRACT)

    # Эскиз18 → Вырез-Вытянуть12 (cut)
    with BuildSketch(Plane.XY.offset(17.9)):
        with Locations((-38.885037381, -30.404674672)):
            Rectangle(SKETCH_18_W, SKETCH_18_H)
    extrude(amount=-CUT_EXTRUDE_12_DEPTH, mode=Mode.SUBTRACT)

    # Скругление4
    fillet_4_edges = [part.edges().sort_by_distance(p)[0] for p in [
        (-41.035074763, -27.071849343, 14.1),
    ]]
    fillet(fillet_4_edges, radius=FILLET_4_R)

    # Эскиз19 → Вырез-Вытянуть13 (cut)
    with BuildSketch(Plane.XY.offset(10.3)):
        Polygon((-36.735, -27.306014657), (-37.735, -33.7375), (-36.735, -33.7375), align=None)
    extrude(amount=-CUT_EXTRUDE_13_DEPTH, mode=Mode.SUBTRACT)

    # Эскиз20 → Бобышка-Вытянуть2 (add)
    with BuildSketch(Plane.XZ.offset(35.7375)):
        with Locations((-41.525, 13.4)):
            Rectangle(SKETCH_20_W, SKETCH_20_H)
        with Locations((41.525, 13.4)):
            Rectangle(SKETCH_20_W, SKETCH_20_H)
    extrude(amount=EXTRUDE_2_DEPTH)

    # Фаска2
    chamfer_2_edges = [part.edges().sort_by_distance(p)[0] for p in [
        (41.525, -37.7375, 25),
        (41.525, -37.7375, 1.8),
        (-41.525, -37.7375, 1.8),
        (-41.525, -37.7375, 25),
    ]]
    chamfer(chamfer_2_edges, length=CHAMFER_2_SIZE - 0.0001)  # a hair under: the kernel refuses the full size

    # Фаска3
    chamfer_3_edges = [part.edges().sort_by_distance(p)[0] for p in [
        (-37.235, 24.606266667, 10.3),
        (46.065, -24.433733333, 10.3),
        (-37.235, -24.433733333, 10.3),
        (46.065, 24.606266667, 10.3),
    ]]
    chamfer(chamfer_3_edges, length=CHAMFER_3_SIZE)


solid = part.part
